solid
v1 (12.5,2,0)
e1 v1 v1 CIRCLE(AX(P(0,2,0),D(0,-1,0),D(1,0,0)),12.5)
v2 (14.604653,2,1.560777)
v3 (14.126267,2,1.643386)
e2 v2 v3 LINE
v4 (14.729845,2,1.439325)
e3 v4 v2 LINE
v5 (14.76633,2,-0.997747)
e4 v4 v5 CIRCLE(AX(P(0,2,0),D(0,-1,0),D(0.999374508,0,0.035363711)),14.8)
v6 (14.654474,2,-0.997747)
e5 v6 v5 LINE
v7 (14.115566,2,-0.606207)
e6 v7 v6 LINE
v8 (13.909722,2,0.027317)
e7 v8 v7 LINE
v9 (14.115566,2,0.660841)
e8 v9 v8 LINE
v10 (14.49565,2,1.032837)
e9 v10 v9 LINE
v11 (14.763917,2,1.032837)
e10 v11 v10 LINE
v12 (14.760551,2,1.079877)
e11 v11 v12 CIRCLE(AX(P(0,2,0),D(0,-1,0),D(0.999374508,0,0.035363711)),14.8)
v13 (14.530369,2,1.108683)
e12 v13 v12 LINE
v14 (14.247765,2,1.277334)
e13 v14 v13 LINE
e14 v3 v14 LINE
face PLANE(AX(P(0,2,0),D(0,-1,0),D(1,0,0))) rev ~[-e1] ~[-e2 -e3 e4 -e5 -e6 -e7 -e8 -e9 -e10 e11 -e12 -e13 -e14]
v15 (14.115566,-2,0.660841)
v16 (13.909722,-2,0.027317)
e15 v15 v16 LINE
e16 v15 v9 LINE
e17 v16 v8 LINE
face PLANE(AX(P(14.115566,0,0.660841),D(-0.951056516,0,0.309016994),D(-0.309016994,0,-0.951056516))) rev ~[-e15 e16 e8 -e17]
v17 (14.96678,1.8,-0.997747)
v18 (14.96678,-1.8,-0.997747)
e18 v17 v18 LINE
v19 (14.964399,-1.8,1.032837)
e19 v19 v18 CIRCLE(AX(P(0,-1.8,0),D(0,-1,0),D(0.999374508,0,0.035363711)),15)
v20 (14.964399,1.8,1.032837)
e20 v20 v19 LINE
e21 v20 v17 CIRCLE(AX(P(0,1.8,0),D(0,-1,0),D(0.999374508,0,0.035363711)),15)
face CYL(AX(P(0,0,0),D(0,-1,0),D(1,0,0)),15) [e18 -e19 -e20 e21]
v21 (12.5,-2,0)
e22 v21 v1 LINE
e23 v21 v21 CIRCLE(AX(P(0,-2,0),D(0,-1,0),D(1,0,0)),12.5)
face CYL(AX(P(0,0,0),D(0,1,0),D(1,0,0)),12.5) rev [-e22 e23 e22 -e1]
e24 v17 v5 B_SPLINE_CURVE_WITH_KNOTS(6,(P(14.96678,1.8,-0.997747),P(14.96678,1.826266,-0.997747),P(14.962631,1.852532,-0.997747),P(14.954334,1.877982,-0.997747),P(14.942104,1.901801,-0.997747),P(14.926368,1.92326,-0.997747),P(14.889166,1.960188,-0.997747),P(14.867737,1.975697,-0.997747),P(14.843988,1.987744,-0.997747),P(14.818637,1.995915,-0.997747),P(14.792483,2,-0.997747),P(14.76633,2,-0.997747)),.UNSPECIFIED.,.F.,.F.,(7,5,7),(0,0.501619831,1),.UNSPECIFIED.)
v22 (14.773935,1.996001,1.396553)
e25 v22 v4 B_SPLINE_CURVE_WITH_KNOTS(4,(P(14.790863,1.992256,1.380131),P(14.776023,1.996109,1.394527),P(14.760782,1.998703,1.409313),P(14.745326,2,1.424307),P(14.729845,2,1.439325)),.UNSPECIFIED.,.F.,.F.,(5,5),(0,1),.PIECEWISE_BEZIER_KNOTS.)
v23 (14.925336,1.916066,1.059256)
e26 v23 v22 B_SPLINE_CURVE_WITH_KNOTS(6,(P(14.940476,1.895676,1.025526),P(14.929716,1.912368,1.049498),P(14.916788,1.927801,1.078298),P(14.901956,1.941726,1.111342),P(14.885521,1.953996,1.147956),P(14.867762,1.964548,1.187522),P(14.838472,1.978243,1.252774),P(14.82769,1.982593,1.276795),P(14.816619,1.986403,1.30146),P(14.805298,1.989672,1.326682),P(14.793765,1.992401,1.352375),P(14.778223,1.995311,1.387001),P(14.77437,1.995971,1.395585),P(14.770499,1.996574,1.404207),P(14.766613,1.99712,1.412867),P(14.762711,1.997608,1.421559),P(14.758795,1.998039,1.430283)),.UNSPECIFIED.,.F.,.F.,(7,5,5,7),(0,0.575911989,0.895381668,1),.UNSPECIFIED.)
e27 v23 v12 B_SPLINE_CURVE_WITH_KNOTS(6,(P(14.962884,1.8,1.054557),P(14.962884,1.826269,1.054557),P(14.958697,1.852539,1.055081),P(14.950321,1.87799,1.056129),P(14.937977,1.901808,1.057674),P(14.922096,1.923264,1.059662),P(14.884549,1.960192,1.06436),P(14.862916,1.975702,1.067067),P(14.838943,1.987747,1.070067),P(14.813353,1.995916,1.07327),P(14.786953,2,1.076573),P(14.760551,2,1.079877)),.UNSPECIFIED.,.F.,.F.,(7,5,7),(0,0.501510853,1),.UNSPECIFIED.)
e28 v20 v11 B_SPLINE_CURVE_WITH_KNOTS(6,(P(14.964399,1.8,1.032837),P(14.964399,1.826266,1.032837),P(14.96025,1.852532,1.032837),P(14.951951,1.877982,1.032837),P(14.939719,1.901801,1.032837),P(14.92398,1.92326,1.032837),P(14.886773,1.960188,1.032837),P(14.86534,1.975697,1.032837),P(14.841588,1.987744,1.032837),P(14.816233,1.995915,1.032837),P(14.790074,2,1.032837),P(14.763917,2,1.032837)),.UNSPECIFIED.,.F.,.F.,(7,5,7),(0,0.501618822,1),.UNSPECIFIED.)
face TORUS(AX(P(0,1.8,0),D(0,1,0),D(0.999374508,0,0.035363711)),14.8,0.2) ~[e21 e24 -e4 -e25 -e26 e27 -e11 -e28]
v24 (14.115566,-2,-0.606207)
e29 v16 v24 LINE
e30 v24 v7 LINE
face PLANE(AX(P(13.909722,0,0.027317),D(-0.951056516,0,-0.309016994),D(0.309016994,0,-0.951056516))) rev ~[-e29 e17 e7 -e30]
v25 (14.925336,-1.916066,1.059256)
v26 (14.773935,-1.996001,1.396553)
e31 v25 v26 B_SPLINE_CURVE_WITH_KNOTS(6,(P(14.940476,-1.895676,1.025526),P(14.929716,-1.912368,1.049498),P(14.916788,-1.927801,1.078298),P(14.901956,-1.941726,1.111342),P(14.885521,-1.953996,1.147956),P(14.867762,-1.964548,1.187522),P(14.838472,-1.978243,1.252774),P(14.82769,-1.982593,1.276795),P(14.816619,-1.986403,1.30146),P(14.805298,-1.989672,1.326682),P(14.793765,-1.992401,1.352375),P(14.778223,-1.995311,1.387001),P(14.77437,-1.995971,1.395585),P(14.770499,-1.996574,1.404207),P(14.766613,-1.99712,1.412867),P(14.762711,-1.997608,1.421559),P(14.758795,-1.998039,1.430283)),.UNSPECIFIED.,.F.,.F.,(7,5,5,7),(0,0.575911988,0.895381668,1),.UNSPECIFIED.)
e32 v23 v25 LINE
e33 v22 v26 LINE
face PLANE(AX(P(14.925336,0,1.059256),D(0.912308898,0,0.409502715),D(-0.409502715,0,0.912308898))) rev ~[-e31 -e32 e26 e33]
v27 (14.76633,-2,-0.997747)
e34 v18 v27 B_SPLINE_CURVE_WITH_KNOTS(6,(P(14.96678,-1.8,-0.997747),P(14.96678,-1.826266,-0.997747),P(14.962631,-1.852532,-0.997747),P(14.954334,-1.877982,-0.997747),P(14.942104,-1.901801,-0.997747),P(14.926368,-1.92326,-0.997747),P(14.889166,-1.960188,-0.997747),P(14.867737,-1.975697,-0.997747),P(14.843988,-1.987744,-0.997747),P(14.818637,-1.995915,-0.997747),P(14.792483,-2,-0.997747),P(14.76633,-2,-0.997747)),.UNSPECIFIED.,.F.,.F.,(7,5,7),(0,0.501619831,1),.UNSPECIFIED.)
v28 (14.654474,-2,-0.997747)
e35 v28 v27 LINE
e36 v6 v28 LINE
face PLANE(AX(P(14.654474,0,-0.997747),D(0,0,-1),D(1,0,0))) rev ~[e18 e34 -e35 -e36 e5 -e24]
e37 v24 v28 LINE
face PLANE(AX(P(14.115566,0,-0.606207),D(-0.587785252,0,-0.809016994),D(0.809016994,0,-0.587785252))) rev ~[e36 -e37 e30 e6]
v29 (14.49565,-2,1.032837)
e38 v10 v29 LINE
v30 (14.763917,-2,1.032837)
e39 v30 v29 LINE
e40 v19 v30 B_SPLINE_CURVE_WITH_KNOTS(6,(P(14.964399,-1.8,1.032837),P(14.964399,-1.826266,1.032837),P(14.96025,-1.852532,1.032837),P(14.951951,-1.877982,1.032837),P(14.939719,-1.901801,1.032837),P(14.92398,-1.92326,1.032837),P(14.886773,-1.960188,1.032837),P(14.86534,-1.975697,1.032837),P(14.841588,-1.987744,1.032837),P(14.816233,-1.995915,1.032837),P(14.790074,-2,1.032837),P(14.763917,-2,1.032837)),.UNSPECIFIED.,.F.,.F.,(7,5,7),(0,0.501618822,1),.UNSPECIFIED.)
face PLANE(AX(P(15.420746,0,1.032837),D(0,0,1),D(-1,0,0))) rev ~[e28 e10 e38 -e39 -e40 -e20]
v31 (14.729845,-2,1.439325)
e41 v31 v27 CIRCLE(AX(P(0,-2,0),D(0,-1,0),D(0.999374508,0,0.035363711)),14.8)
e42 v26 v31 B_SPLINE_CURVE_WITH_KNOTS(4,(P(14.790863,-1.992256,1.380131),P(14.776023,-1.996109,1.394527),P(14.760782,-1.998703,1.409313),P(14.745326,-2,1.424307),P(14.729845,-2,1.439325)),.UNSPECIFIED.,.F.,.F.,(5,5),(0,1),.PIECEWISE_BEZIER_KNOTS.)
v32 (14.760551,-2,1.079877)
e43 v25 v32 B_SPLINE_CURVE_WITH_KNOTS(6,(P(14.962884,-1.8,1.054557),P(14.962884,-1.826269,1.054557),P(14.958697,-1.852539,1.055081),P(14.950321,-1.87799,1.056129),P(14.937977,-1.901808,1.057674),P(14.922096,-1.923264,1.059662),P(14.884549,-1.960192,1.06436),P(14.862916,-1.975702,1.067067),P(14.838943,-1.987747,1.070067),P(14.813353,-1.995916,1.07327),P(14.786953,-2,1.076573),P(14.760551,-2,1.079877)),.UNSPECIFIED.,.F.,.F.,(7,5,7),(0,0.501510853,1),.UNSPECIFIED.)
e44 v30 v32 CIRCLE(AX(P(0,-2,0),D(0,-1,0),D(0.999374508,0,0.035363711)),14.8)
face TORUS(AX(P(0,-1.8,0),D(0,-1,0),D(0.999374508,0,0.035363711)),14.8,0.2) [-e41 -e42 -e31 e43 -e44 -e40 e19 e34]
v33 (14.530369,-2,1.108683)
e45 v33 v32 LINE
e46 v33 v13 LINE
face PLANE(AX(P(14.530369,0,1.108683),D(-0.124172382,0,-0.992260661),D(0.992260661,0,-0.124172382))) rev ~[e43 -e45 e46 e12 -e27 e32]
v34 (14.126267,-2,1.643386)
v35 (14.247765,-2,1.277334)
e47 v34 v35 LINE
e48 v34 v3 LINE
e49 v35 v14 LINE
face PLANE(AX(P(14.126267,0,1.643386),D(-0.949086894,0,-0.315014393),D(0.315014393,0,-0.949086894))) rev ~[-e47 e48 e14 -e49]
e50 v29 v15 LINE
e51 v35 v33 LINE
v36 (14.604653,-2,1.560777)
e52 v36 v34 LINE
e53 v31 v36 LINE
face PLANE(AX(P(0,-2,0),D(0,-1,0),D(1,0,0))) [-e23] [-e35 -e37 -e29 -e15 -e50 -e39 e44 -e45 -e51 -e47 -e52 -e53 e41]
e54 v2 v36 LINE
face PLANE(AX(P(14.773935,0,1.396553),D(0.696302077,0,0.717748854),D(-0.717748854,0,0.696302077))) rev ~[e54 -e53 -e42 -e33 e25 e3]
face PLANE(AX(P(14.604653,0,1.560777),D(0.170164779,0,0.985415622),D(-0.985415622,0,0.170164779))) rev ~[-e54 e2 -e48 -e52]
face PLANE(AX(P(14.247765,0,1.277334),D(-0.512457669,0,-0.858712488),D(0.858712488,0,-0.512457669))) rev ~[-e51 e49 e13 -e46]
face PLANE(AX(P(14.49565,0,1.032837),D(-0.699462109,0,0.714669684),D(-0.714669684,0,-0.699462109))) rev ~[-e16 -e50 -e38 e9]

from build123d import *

# Parameters (mm, degrees)
F0_R        = 15
F0_R_2      = 12.5
F2_DEPTH    = 2
F3_DEPTH    = 2
F5_T2_ANGLE = 356.0811167668
F5_T4_ANGLE = 356.0811167668


# Not quite as in the source:
# - a fillet or chamfer that OpenCascade refuses, or shapes differently, is made with other operations: its cross-section is extruded or revolved along the edge and cut away or added


with BuildPart() as f2:
    # F0 (on Front) → F2 (new body, symmetric)
    with BuildSketch(Plane.XZ):
        Circle(F0_R)
        Circle(F0_R_2, mode=Mode.SUBTRACT)
    extrude(amount=F2_DEPTH, both=True)


with BuildPart() as f3:
    # F1 (on Front) → F3 (new body, symmetric)
    with BuildSketch(Plane.XZ):
        Polygon((14.1155660557, -0.6062071938), (14.654473997, -0.9977467319), (15.3206008461, -0.9977467319), (15.8595087875, -0.6062071938), (16.0653533043, 0.0273170867), (15.8595087875, 0.6608413673), (15.4207458886, 1.032837417), (14.98814394, 1.032837417), (14.4956499742, 1.032837417), (14.1155660557, 0.6608413673), (13.9097215389, 0.0273170867), align=None)
    extrude(amount=F3_DEPTH, both=True)


with BuildPart() as f3b:
    # F1 (on Front) → F3, piece 2 (new body, symmetric)
    with BuildSketch(Plane.XZ):
        Polygon((14.5303690806, 1.108682598), (14.9253355339, 1.0592561448), (14.7739350796, 1.3965530088), (14.6046532318, 1.5607766109), (14.1262672842, 1.6433858545), (14.2477648333, 1.2773335911), align=None)
    extrude(amount=F3_DEPTH, both=True)


with BuildPart() as f3c:
    # F1 (on Front) → F3, piece 3 (new body, symmetric)
    with BuildSketch(Plane.XZ):
        Polygon((15.1731697154, 1.4260609763), (14.9909034371, 1.0592561448), (15.3603749383, 1.0987263252), (15.5725924471, 1.2016314485), (15.8138373742, 1.622913168), (15.4283061543, 1.6339400652), align=None)
    extrude(amount=F3_DEPTH, both=True)


with BuildPart() as f2_1:
    add(f2.part)

    # F4: cut F3, F3c, F3b
    add(f3.part, mode=Mode.SUBTRACT)
    add(f3c.part, mode=Mode.SUBTRACT)
    add(f3b.part, mode=Mode.SUBTRACT)

    # F5: fillet of radius 0.2 on 2 edges, made by hand

    # F5_s1 → F5_t2 (revolve, cut)
    with BuildSketch(Plane(origin=(0, 0, 0), x_dir=(0, 1, 0), z_dir=(0.0353637111, 0, -0.9993745084))):
        with BuildLine():
            ThreePointArc((-1.8, 15), (-1.9414213562, 14.9414213562), (-2, 14.8))
            Line((-2, 14.8), (-2, 15))
            Line((-2, 15), (-1.8, 15))
        make_face()
    revolve(axis=Axis((0, -2, 0), (0, -1, 0)), revolution_arc=F5_T2_ANGLE, mode=Mode.SUBTRACT)

    # F5_s3 → F5_t4 (revolve, cut)
    with BuildSketch(Plane(origin=(0, 0, 0), x_dir=(0, 1, 0), z_dir=(0.0353637111, 0, -0.9993745084))):
        with BuildLine():
            ThreePointArc((1.8, 15), (1.9414213562, 14.9414213562), (2, 14.8))
            Line((2, 14.8), (2, 15))
            Line((2, 15), (1.8, 15))
        make_face()
    revolve(axis=Axis((0, 2, 0), (0, -1, 0)), revolution_arc=F5_T4_ANGLE, mode=Mode.SUBTRACT)


solid = f2_1.part
